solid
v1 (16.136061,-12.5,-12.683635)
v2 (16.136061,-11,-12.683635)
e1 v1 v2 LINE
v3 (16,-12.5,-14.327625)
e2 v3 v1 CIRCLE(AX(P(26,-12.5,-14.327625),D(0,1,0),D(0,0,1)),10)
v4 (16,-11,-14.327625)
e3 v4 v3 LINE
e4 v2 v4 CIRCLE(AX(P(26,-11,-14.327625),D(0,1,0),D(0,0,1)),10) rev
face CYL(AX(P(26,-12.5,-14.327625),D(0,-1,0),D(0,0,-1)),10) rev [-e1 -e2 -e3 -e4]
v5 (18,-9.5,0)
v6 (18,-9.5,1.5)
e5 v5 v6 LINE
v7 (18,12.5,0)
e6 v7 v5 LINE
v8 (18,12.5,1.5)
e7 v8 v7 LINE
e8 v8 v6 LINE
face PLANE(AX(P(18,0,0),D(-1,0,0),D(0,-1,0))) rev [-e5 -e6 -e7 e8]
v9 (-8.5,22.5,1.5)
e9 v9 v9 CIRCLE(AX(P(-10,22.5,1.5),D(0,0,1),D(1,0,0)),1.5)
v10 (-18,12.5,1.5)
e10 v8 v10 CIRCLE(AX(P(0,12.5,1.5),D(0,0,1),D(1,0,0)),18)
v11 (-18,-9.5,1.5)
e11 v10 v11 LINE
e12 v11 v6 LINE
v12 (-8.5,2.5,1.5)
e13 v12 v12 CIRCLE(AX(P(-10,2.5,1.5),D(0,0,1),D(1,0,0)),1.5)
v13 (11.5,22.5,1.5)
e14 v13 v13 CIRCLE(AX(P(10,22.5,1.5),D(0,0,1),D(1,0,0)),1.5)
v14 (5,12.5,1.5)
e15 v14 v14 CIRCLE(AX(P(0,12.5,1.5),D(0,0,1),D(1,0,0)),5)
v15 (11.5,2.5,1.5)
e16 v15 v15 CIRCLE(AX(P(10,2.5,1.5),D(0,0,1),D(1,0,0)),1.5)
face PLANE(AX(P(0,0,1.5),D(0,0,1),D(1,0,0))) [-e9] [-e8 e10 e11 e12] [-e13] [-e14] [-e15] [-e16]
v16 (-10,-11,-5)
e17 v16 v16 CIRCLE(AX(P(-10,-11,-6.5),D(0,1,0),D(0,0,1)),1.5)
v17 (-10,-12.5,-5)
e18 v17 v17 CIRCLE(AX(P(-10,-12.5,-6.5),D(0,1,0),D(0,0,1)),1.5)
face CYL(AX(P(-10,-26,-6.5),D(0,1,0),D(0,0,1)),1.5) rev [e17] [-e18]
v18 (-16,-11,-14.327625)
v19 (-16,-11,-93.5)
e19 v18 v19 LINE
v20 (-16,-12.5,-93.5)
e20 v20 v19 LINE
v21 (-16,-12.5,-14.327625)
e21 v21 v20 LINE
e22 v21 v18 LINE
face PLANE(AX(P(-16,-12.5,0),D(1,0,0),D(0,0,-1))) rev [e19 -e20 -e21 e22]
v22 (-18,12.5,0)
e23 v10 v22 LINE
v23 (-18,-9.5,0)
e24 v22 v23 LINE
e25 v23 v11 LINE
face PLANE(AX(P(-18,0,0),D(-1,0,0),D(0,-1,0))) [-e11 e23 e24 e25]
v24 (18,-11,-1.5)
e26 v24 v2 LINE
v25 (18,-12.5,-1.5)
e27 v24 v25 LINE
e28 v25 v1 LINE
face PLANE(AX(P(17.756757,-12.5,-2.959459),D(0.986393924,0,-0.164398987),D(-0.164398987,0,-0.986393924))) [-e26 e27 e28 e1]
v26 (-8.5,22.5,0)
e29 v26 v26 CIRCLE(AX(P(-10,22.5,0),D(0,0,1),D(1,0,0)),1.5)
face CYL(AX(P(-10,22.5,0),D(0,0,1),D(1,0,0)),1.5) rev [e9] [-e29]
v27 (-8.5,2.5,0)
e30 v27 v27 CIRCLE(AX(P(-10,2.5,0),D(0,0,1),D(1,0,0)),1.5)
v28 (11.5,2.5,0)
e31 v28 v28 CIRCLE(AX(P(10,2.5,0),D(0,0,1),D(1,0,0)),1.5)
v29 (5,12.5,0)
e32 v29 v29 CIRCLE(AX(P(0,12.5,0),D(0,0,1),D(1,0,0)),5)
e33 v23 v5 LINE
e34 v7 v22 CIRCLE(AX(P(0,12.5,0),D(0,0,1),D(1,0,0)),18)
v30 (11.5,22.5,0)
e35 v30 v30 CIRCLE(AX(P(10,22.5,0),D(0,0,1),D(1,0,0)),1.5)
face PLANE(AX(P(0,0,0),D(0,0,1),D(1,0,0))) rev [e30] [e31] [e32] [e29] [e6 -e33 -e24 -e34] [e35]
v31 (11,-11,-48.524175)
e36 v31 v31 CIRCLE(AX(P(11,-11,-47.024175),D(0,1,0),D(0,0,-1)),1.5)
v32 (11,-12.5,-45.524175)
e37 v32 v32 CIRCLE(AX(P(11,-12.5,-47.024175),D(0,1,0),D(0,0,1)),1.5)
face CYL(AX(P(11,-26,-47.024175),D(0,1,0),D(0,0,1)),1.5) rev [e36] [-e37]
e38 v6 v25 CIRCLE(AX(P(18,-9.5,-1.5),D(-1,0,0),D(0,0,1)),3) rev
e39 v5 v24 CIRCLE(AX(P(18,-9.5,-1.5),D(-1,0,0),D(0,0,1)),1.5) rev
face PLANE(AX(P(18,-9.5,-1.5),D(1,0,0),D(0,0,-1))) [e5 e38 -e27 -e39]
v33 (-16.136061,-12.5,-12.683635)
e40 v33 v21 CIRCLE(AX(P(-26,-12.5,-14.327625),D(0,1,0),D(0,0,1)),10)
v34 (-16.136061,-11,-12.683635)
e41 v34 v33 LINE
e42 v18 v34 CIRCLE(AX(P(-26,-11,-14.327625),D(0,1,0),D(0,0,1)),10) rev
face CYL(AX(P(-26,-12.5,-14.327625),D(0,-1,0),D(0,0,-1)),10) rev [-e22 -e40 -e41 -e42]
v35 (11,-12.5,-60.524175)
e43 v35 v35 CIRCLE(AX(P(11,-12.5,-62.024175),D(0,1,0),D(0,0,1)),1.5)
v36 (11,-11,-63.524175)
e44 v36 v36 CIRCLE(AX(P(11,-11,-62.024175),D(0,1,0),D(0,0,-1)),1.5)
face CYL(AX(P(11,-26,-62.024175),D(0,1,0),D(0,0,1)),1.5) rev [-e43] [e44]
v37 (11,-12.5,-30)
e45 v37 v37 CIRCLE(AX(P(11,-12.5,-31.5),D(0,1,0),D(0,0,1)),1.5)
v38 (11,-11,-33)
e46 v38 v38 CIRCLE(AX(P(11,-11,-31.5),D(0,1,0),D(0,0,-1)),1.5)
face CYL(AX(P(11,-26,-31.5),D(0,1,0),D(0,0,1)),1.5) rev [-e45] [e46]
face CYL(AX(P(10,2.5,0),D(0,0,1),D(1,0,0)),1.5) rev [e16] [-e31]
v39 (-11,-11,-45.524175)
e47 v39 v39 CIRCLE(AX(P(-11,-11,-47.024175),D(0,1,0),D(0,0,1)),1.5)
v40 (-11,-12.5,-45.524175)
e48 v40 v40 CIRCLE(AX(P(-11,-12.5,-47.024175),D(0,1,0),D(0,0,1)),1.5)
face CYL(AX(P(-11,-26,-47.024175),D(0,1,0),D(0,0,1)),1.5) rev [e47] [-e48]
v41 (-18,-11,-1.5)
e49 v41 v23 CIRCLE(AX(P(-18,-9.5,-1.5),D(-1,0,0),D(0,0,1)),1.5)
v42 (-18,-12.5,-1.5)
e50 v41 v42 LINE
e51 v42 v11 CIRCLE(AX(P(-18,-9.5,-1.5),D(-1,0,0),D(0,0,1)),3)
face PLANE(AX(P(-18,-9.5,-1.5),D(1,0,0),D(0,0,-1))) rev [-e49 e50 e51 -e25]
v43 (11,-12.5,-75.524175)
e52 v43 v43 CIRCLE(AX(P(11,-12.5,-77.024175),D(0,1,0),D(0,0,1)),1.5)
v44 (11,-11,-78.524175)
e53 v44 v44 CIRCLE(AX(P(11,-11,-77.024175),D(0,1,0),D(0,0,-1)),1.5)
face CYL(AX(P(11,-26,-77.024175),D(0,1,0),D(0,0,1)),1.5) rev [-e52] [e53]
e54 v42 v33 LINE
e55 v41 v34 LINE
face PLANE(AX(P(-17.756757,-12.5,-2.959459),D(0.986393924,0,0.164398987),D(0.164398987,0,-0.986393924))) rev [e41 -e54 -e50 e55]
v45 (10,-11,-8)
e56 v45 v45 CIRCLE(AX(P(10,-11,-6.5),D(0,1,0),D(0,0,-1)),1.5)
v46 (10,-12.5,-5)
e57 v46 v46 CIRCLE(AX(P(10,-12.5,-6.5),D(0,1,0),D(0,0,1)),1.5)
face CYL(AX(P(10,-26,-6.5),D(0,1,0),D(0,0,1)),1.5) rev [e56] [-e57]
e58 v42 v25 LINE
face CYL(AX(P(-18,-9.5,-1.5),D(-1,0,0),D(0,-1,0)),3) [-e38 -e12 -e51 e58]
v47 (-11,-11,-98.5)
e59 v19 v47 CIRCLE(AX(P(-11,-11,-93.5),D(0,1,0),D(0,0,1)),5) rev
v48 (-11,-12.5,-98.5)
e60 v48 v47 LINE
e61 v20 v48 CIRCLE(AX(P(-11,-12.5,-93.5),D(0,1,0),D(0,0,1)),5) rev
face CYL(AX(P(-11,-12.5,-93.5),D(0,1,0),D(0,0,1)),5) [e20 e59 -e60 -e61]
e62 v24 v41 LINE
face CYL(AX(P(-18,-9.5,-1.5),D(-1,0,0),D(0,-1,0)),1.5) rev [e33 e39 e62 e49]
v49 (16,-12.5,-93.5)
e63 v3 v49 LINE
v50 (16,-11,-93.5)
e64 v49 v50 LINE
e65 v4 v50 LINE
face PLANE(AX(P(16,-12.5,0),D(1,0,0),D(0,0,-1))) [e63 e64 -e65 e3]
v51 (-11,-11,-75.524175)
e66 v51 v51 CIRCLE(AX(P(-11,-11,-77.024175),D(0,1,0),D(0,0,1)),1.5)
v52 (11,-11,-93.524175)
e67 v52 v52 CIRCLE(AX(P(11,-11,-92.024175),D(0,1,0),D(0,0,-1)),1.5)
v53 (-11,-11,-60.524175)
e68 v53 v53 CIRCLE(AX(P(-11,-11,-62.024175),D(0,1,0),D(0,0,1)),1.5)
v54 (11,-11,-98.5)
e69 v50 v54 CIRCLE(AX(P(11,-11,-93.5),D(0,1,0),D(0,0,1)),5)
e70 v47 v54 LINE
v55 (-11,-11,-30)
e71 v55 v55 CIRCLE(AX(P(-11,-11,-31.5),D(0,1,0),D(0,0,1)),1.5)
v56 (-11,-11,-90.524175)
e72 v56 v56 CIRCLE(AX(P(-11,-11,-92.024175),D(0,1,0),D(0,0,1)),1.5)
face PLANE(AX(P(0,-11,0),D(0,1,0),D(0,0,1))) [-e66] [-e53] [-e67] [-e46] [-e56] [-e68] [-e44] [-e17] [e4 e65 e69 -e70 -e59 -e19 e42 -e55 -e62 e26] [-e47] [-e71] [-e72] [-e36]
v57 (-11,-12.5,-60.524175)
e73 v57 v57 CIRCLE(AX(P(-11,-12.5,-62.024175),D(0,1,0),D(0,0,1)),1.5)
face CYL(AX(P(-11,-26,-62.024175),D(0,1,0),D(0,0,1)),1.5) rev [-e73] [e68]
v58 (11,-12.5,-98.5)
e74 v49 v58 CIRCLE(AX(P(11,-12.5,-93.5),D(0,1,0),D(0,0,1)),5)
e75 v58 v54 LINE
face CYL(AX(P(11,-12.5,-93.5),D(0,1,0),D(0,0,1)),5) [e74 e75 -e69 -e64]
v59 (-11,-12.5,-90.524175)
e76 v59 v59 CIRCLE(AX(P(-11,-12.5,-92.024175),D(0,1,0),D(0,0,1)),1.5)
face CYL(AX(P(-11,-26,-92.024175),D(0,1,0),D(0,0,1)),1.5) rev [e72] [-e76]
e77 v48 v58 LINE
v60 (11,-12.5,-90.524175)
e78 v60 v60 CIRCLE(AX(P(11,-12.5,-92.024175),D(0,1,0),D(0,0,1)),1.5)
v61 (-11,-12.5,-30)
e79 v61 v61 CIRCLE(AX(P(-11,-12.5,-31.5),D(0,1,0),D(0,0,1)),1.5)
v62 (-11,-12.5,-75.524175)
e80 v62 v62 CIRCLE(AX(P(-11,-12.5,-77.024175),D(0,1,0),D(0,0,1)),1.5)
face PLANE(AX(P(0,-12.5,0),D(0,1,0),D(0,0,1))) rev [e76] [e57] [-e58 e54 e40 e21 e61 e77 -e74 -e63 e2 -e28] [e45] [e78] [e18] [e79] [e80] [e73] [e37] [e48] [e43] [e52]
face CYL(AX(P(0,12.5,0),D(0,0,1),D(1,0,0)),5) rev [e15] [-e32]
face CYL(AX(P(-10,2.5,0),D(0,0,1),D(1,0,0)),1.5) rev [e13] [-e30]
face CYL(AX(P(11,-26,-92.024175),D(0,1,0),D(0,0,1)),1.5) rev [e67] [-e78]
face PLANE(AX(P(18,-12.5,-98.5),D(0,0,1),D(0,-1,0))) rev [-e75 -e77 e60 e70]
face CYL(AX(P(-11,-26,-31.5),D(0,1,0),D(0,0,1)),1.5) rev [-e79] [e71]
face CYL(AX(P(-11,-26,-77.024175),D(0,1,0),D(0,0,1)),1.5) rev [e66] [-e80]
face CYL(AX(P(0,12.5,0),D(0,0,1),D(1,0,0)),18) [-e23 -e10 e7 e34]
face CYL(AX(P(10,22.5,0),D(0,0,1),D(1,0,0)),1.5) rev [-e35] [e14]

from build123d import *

# Parameters (mm, degrees)
SKETCH2_R                    = 1.5
BOSS_EXTRUDE1_DEPTH          = 1.5
EDGE_FLANGE1_STRIP_W         = 9
EDGE_FLANGE1_STRIP_H         = 1.5
EDGE_FLANGE1_STRIP_CUT_DEPTH = 36
EDGE_FLANGE1_DEPTH           = 36
CUT_EXTRUDE1_DEPTH           = 1.5
FILLET1_R                    = 10
SKETCH12_R                   = 1.5
CUT_EXTRUDE2_DEPTH           = 15


# Sheet-metal steps are written as plain solids
with BuildPart() as part:
    # Sketch2 → Boss-Extrude1 (new body)
    with BuildSketch(Plane.XY):
        with BuildLine():
            ThreePointArc((18, 12.5), (0, 30.5), (-18, 12.5))
            Line((-18, 12.5), (-18, -12.5))
            Line((-18, -12.5), (18, -12.5))
            Line((18, -12.5), (18, 12.5))
        make_face()
        with Locations((-10, 2.5)):
            Circle(SKETCH2_R, mode=Mode.SUBTRACT)
        with BuildLine():
            ThreePointArc((-3.535533906, 16.035533906), (0, 17.5), (3.535533906, 16.035533906))
            ThreePointArc((3.535533906, 16.035533906), (5, 12.5), (3.535533906, 8.964466094))
            ThreePointArc((3.535533906, 8.964466094), (0, 7.5), (-3.535533906, 8.964466094))
            ThreePointArc((-3.535533906, 8.964466094), (-5, 12.5), (-3.535533906, 16.035533906))
        make_face(mode=Mode.SUBTRACT)
        with Locations((10, 2.5)):
            Circle(SKETCH2_R, mode=Mode.SUBTRACT)
        with Locations((-10, 22.5)):
            Circle(SKETCH2_R, mode=Mode.SUBTRACT)
        with Locations((10, 22.5)):
            Circle(SKETCH2_R, mode=Mode.SUBTRACT)
    extrude(amount=BOSS_EXTRUDE1_DEPTH)

    # Edge-Flange1 strip (across the edge) → Edge-Flange1 strip cut (cut)
    with BuildSketch(Plane(origin=(18, -12.5, 0), x_dir=(0, 1, 0), z_dir=(-1, 0, 0))):
        with Locations((-1.5, -0.75)):
            Rectangle(EDGE_FLANGE1_STRIP_W, EDGE_FLANGE1_STRIP_H)
    extrude(amount=EDGE_FLANGE1_STRIP_CUT_DEPTH, mode=Mode.SUBTRACT)

    # Edge-Flange1 section (across the edge) → Edge-Flange1 (add)
    with BuildSketch(Plane(origin=(18, -12.5, 0), x_dir=(0, 1, 0), z_dir=(-1, 0, 0))):
        with BuildLine():
            Line((0, 1.5), (0, 98.5))
            Line((0, 98.5), (1.5, 98.5))
            Line((1.5, 98.5), (1.5, 1.5))
            ThreePointArc((1.5, 1.5), (1.939339828, 0.439339828), (3, 0))
            Line((3, 0), (3, -1.5))
            ThreePointArc((3, -1.5), (0.878679656, -0.621320344), (0, 1.5))
        make_face()
    extrude(amount=EDGE_FLANGE1_DEPTH)

    # Sketch11 → Cut-Extrude1 (cut)
    with BuildSketch(Plane(origin=(0, -11, 0), x_dir=(1, 0, 0), z_dir=(0, 1, 0))):
        with BuildLine():
            Line((-18, 98.5), (-18, 1.5))
            Line((-18, 1.5), (-16, 13.5))
            Line((-16, 13.5), (-16, 93.5))
            ThreePointArc((-16, 93.5), (-14.535533906, 97.035533906), (-11, 98.5))
            Line((-11, 98.5), (-18, 98.5))
        make_face()
        with BuildLine():
            Line((16, 13.5), (18, 1.5))
            Line((18, 1.5), (18, 98.5))
            Line((18, 98.5), (11, 98.5))
            ThreePointArc((11, 98.5), (14.535533906, 97.035533906), (16, 93.5))
            Line((16, 93.5), (16, 13.5))
        make_face()
    extrude(amount=-CUT_EXTRUDE1_DEPTH, mode=Mode.SUBTRACT)

    # Fillet1
    fillet1_edges = [part.edges().sort_by_distance(p)[0] for p in [
        (-16, -11.75, -13.5),
        (16, -11.75, -13.5),
    ]]
    fillet(fillet1_edges, radius=FILLET1_R)

    # Sketch12 → Cut-Extrude2 (cut)
    with BuildSketch(Plane(origin=(0, -11, 0), x_dir=(1, 0, 0), z_dir=(0, 1, 0))):
        with Locations(Location((-10, 6.5, 0), (0, 0, 270))):
            Circle(SKETCH12_R)
        with Locations(Location((-11, 31.5, 0), (0, 0, 270))):
            Circle(SKETCH12_R)
        with Locations(Location((-11, 47.024174696, 0), (0, 0, 270))):
            Circle(SKETCH12_R)
        with Locations(Location((-11, 62.024174696, 0), (0, 0, 270))):
            Circle(SKETCH12_R)
        with Locations(Location((-11, 77.024174696, 0), (0, 0, 270))):
            Circle(SKETCH12_R)
        with Locations(Location((-11, 92.024174696, 0), (0, 0, 270))):
            Circle(SKETCH12_R)
        with Locations(Location((11, 92.024174696, 0), (0, 0, 270))):
            Circle(SKETCH12_R)
        with Locations(Location((11, 77.024174696, 0), (0, 0, 270))):
            Circle(SKETCH12_R)
        with Locations(Location((11, 62.024174696, 0), (0, 0, 270))):
            Circle(SKETCH12_R)
        with Locations(Location((11, 47.024174696, 0), (0, 0, 270))):
            Circle(SKETCH12_R)
        with Locations(Location((11, 31.5, 0), (0, 0, 270))):
            Circle(SKETCH12_R)
        with Locations(Location((10, 6.5, 0), (0, 0, 270))):
            Circle(SKETCH12_R)
    extrude(amount=-CUT_EXTRUDE2_DEPTH, mode=Mode.SUBTRACT)


solid = part.part
